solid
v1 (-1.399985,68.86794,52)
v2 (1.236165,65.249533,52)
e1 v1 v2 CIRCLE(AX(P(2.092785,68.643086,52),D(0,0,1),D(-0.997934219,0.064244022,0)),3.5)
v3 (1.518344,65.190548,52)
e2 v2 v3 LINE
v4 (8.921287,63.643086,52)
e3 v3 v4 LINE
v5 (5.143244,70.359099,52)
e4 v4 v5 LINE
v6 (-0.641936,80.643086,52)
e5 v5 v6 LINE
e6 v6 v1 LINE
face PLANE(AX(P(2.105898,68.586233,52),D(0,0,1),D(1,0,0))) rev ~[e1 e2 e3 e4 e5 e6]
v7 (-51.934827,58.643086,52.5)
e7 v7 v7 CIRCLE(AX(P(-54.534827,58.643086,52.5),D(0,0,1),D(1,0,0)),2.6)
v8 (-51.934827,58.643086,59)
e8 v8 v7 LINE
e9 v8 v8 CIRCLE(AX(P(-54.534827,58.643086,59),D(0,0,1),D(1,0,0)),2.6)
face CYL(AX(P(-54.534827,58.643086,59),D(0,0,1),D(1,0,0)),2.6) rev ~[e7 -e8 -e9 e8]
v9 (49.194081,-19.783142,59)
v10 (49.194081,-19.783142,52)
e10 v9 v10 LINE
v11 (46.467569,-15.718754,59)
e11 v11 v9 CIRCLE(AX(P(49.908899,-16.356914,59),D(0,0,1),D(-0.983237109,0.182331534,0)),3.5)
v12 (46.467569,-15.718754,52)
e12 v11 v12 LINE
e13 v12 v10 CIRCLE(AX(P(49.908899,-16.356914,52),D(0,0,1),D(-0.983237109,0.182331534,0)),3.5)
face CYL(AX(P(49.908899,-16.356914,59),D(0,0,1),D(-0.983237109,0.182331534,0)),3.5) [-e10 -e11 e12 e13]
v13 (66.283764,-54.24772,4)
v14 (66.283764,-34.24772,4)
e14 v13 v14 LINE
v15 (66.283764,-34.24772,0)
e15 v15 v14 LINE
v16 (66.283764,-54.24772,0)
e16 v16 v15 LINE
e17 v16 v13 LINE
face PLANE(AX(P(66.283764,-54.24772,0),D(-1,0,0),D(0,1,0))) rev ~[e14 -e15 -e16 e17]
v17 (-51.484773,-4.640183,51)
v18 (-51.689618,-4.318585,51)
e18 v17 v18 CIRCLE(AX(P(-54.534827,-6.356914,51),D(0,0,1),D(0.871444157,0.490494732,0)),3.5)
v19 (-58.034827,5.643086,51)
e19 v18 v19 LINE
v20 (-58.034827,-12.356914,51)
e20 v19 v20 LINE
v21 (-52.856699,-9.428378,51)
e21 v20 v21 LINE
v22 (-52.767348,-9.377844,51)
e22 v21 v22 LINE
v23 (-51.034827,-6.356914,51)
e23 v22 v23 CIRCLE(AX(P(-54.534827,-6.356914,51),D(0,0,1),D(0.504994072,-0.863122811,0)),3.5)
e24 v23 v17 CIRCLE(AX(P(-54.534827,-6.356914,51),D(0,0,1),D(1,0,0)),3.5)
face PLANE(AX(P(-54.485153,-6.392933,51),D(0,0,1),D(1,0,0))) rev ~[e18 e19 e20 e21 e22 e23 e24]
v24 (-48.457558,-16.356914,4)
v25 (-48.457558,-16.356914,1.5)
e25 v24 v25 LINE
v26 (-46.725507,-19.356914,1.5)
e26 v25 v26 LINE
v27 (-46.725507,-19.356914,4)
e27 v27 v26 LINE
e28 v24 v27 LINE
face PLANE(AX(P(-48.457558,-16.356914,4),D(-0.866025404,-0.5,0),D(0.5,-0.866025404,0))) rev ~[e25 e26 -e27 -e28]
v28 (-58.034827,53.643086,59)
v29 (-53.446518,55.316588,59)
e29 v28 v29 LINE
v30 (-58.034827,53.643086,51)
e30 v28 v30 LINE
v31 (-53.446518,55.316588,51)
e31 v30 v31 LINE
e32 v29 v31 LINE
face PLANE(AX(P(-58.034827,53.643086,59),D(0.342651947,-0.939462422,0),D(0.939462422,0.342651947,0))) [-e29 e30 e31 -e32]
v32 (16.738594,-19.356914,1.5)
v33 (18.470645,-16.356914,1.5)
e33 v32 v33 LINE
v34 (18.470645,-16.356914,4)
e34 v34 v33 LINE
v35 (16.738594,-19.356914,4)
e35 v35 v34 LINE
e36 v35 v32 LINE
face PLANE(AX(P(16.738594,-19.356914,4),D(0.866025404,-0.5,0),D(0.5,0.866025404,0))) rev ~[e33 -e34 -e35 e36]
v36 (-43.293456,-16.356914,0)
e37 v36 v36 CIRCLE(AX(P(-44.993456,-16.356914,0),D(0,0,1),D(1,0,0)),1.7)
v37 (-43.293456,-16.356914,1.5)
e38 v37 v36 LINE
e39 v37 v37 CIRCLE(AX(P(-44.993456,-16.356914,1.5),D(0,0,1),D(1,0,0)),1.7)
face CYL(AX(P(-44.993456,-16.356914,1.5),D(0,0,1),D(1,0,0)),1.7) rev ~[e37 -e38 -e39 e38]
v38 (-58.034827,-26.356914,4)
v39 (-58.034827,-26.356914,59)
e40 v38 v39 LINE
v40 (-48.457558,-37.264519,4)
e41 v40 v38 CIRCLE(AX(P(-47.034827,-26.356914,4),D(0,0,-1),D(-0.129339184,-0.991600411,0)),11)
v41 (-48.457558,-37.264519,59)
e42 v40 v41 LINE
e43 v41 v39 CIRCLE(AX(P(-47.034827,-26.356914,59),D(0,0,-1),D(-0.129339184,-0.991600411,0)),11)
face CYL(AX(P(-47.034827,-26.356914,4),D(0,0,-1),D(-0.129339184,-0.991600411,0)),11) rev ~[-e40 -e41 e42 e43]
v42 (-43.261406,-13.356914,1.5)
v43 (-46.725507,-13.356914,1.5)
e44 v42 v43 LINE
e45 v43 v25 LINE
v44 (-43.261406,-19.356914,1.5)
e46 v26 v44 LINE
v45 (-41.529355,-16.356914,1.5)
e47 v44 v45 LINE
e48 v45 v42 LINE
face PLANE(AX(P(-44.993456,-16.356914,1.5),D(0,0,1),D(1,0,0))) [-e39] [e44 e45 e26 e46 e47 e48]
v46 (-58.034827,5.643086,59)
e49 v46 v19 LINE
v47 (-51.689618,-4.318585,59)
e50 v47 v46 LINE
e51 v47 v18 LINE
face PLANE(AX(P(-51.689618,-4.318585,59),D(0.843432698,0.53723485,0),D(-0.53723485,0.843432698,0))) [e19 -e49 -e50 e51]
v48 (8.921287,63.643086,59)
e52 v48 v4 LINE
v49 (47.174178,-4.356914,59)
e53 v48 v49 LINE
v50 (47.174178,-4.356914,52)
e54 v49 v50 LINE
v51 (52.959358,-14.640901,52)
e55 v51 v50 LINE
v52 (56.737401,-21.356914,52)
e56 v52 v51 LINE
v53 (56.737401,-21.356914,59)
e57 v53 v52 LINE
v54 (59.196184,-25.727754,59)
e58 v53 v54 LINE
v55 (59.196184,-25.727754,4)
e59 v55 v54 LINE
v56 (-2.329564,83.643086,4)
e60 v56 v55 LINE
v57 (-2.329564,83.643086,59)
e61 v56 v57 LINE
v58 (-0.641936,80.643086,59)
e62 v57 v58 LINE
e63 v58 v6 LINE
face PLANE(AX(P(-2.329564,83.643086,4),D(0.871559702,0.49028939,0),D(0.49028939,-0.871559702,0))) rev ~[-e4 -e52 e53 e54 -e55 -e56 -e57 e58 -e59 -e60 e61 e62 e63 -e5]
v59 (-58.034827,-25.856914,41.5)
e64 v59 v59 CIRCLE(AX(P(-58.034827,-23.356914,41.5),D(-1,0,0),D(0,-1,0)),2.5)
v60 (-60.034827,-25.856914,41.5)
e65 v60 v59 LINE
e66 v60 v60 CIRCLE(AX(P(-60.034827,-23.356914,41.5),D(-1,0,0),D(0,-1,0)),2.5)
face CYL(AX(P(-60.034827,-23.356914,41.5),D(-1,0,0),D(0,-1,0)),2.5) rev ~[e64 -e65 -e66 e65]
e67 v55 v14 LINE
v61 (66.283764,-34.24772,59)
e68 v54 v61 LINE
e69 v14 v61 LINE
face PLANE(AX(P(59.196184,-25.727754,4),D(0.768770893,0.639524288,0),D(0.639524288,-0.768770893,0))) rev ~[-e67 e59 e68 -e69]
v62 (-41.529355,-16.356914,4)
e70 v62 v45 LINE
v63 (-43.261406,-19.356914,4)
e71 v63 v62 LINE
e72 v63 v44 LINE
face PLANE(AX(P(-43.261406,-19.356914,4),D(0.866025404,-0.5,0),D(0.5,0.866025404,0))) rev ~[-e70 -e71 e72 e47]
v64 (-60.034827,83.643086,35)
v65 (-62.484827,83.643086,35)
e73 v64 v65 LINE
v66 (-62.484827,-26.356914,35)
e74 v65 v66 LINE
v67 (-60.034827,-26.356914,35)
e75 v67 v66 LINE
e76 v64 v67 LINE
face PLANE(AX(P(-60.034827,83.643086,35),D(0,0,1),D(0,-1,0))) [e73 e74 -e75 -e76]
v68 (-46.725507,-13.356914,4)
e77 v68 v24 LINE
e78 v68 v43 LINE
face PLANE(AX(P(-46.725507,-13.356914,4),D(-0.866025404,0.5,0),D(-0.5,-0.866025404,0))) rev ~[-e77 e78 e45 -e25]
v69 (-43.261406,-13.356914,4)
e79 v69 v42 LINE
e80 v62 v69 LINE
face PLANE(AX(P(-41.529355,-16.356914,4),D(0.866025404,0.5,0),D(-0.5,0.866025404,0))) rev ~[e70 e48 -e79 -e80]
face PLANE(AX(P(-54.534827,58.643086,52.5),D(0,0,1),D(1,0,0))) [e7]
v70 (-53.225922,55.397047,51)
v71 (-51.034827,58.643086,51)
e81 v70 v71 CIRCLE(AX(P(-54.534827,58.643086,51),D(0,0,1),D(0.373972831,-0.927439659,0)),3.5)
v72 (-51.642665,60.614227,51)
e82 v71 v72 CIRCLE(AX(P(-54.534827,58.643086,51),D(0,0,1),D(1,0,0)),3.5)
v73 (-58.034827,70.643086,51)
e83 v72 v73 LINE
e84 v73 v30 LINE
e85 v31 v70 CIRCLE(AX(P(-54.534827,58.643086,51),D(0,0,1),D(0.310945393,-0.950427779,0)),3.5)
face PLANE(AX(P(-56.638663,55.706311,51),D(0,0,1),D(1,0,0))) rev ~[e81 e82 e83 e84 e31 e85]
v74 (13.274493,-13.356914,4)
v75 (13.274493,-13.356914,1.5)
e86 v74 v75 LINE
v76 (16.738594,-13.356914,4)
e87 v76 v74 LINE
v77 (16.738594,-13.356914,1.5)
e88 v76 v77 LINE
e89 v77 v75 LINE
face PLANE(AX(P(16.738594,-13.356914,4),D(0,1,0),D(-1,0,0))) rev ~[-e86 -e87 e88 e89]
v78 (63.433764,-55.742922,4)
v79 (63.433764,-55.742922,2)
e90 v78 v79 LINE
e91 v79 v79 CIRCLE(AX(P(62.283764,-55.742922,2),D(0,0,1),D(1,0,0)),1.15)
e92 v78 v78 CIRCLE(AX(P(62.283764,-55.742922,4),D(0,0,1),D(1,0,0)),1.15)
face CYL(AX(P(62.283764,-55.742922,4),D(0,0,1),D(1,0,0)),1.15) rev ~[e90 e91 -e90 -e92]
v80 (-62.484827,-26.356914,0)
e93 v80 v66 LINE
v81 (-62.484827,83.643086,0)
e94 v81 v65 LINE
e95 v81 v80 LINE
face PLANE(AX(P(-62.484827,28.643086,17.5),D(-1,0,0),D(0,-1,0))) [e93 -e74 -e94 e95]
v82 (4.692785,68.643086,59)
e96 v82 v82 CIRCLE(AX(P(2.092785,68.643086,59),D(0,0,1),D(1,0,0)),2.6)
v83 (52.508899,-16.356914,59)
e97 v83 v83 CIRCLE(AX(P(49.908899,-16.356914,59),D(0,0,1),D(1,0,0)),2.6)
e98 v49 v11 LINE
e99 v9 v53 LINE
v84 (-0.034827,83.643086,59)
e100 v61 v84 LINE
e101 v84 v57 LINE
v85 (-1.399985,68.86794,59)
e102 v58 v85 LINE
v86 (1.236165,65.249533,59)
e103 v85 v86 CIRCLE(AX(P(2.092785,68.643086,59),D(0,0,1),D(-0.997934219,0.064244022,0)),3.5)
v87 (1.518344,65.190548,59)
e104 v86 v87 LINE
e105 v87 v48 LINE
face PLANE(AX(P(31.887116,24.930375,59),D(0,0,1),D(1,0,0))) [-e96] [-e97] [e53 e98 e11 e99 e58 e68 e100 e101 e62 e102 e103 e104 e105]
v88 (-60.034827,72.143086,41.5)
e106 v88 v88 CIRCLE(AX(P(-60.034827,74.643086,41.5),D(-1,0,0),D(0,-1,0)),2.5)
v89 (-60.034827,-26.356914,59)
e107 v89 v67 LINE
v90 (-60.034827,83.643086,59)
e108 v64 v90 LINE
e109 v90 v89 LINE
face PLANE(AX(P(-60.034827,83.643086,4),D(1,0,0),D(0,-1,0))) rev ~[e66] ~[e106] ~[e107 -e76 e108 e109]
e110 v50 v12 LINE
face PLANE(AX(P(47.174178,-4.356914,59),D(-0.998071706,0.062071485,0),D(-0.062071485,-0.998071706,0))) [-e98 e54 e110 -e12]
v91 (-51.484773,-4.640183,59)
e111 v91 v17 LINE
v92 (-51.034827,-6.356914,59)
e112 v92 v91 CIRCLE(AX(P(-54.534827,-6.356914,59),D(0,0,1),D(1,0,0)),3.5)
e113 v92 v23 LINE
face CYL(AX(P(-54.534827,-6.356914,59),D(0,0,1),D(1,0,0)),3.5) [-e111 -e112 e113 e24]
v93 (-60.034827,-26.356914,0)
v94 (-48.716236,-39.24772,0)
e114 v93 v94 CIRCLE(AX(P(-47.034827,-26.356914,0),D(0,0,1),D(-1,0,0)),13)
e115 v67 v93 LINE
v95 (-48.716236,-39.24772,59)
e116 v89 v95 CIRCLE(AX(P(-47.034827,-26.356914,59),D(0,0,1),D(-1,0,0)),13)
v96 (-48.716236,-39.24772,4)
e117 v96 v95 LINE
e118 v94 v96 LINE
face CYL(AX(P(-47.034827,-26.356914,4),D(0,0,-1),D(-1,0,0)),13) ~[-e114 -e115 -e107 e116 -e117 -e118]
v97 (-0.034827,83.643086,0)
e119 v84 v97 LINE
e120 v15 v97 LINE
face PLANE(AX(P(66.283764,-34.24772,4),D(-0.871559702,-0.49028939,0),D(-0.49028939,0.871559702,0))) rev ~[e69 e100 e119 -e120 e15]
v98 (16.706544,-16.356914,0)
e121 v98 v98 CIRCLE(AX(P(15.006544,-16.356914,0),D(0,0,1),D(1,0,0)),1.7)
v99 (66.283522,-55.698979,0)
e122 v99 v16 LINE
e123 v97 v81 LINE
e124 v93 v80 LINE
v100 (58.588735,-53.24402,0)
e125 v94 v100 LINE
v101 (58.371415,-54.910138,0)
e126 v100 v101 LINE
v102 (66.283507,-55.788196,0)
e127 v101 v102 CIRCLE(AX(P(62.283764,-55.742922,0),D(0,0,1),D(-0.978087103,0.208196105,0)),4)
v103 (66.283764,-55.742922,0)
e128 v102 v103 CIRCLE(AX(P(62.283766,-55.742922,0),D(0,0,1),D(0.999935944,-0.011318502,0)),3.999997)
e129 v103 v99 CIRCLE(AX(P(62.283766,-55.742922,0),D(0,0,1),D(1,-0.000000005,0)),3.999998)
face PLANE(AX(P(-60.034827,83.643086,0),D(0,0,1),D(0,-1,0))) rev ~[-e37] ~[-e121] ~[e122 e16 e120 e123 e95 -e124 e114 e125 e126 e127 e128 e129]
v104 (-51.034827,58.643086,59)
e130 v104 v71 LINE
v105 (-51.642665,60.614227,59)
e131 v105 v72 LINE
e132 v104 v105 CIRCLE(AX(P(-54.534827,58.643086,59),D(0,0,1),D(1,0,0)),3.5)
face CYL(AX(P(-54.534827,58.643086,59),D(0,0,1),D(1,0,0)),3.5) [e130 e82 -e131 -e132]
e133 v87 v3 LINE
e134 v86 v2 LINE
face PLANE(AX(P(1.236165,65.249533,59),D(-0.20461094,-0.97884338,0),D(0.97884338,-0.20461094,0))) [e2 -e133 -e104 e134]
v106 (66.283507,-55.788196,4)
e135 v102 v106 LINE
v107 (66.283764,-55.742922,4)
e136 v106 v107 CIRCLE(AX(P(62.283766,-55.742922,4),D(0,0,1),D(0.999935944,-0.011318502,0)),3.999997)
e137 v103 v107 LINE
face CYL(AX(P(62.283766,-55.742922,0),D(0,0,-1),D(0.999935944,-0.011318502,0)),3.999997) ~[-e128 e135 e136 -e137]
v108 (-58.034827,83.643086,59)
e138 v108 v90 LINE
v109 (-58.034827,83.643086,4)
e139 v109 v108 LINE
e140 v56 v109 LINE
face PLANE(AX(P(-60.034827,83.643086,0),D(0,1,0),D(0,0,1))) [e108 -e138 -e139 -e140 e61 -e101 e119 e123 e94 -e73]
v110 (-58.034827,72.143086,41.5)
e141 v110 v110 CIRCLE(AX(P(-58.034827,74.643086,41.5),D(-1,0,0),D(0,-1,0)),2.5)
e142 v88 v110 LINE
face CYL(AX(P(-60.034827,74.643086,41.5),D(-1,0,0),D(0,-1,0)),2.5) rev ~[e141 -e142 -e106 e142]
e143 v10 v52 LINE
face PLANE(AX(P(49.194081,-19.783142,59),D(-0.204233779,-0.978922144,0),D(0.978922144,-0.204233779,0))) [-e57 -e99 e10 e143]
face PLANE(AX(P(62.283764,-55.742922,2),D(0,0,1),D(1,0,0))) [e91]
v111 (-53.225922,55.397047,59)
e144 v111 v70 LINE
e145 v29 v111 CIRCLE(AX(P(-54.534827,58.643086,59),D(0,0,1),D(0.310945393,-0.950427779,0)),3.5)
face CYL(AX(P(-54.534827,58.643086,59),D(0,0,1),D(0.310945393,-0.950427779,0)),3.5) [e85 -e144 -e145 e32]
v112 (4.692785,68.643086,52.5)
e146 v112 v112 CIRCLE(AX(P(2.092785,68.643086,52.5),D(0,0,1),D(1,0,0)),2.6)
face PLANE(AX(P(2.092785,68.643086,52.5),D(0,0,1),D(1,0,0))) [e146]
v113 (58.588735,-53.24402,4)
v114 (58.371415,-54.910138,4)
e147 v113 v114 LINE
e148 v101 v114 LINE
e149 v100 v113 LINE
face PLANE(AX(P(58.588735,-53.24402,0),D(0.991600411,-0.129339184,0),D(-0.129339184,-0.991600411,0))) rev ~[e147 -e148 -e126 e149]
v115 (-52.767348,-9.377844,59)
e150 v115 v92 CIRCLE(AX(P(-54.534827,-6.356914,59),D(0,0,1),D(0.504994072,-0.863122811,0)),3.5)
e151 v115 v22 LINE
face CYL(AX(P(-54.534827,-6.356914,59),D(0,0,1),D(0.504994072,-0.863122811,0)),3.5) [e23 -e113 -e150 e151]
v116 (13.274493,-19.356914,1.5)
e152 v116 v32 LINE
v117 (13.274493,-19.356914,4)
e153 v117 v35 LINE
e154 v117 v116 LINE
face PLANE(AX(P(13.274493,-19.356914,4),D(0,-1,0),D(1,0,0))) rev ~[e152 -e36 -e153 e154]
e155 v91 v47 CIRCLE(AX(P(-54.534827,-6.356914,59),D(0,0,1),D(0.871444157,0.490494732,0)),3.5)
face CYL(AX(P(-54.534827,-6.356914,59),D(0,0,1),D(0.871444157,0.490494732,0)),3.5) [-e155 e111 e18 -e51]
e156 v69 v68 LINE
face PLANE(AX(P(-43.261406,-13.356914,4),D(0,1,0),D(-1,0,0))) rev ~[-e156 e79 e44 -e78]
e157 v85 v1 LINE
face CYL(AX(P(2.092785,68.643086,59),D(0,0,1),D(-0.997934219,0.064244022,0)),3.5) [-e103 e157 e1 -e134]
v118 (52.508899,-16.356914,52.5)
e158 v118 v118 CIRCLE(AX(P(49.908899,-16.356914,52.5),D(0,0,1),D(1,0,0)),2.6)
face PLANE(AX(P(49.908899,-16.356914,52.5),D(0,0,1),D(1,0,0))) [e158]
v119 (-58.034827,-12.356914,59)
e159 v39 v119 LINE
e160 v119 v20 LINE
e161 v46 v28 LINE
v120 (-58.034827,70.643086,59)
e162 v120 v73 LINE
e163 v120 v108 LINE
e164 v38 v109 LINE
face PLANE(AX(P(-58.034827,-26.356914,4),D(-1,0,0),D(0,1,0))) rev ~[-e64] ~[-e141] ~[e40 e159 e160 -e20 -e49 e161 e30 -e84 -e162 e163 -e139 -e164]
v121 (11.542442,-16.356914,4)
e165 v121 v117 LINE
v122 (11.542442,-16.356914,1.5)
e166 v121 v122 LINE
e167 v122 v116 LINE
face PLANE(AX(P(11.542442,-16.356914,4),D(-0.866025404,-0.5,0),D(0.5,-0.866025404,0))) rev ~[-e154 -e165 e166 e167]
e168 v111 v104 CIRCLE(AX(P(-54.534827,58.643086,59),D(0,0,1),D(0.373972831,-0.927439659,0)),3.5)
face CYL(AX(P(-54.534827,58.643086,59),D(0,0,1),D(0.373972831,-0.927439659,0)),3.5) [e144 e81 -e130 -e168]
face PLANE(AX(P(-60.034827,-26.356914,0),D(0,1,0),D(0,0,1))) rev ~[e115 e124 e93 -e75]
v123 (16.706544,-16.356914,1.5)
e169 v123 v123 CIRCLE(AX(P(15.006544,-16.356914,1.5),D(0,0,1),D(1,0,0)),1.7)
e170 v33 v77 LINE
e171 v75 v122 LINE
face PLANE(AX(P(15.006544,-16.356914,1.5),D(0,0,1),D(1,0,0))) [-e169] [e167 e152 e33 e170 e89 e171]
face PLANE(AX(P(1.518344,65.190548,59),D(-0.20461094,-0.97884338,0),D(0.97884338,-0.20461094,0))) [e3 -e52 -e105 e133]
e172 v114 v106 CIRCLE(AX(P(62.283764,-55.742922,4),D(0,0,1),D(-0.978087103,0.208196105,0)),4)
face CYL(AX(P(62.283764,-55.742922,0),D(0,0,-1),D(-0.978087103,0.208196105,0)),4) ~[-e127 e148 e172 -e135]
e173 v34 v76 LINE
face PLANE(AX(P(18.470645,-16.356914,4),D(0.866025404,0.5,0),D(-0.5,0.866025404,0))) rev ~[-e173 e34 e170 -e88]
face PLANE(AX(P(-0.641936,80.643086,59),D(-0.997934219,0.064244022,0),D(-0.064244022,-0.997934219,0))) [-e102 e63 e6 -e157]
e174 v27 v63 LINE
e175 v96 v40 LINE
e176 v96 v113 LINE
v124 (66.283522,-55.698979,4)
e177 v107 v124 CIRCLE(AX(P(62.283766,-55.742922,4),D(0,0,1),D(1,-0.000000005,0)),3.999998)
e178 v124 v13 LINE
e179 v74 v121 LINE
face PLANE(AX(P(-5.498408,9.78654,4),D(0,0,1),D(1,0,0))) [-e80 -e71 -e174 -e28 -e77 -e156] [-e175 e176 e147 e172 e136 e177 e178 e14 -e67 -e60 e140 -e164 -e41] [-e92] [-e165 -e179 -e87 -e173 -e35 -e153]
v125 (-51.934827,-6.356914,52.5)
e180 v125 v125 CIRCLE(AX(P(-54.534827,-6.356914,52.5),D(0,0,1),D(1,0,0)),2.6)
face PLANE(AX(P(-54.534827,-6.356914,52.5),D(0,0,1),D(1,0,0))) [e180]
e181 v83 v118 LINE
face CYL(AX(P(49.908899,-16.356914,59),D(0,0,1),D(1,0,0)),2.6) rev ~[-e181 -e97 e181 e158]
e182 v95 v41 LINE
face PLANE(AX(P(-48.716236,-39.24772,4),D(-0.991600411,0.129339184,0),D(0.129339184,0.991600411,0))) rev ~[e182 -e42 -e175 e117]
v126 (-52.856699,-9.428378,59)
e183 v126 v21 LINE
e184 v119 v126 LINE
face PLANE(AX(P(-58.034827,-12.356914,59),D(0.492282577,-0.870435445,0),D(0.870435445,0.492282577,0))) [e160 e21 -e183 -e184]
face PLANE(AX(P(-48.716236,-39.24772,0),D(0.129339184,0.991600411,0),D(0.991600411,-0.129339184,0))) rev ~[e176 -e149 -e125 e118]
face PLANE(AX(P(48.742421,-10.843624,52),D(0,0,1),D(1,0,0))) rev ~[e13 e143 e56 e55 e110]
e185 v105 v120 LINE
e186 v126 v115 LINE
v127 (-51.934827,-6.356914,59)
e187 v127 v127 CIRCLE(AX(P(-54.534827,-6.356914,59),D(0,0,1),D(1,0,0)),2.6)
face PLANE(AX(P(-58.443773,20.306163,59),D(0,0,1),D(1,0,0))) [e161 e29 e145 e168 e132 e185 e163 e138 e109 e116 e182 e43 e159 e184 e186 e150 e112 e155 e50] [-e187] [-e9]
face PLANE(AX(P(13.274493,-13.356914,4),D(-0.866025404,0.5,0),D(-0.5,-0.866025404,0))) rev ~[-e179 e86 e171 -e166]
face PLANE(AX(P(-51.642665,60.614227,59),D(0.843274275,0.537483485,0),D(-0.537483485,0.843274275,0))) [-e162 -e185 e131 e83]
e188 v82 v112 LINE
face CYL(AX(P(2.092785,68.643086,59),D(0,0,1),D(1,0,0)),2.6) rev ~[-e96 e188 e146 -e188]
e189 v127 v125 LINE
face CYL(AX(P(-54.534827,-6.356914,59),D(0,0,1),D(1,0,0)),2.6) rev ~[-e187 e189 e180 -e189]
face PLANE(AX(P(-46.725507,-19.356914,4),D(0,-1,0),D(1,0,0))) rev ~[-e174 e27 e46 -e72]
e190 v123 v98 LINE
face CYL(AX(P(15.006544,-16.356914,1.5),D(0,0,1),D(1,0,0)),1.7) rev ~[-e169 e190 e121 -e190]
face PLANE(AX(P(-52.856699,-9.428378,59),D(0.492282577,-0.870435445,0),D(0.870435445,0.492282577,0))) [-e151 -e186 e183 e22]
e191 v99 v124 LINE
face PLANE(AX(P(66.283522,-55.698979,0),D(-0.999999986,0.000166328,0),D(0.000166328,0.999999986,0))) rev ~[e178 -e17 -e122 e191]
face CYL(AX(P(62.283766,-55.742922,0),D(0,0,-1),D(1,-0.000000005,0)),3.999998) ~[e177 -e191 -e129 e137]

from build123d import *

# Parameters (mm, degrees)
F1_DEPTH  = 4
F3_DEPTH  = 55
F4_R      = 2.5
F5_DEPTH  = 2
F6_R      = 1.15
F7_DEPTH  = 2
F9_DEPTH  = 2.5
F10_R     = 1.7
F11_DEPTH = 1.5
F12_R     = 1.7
F13_DEPTH = 1.5
F15_DEPTH = 8
F17_DEPTH = 7
F18_R     = 2.6
F19_DEPTH = 6.5
F20_R     = 2.6
F21_DEPTH = 6.5
F22_W     = 110
F22_H     = 35
F23_DEPTH = 2.45


with BuildPart() as f1:
    # F0 (on Top) → F1 (new body)
    with BuildSketch(Plane.XY):
        with BuildLine():
            Line((-0.0348270737, 83.6430855933), (-60.0348270737, 83.6430855933))
            Line((-60.0348270737, 83.6430855933), (-60.0348270737, -26.3569144067))
            ThreePointArc((-60.0348270737, -26.3569144067), (-56.8036121084, -34.9342589227), (-48.7162364666, -39.2477197521))
            Line((-48.7162364666, -39.2477197521), (58.5887347718, -53.2440203484))
            Line((58.5887347718, -53.2440203484), (59.1074373156, -53.3116772019))
            ThreePointArc((59.1074373156, -53.3116772019), (62.8011202697, -51.776520456), (65.9774464875, -54.2077653548))
            Line((65.9774464875, -54.2077653548), (66.2837635334, -54.2477197521))
            Line((66.2837635334, -54.2477197521), (66.2837635334, -34.2477197521))
            Line((66.2837635334, -34.2477197521), (-0.0348270737, 83.6430855933))
        make_face()
        with BuildLine():
            Line((59.1074373156, -53.3116772019), (58.5887347718, -53.2440203484))
            Line((58.5887347718, -53.2440203484), (58.3714151196, -54.9101376817))
            ThreePointArc((58.3714151196, -54.9101376817), (58.6504322817, -54.0699295678), (59.1074373156, -53.3116772019))
        make_face()
        with BuildLine():
            Line((66.2835221478, -55.6989786465), (66.2837635334, -54.2477197521))
            Line((66.2837635334, -54.2477197521), (65.9774464875, -54.2077653548))
            ThreePointArc((65.9774464875, -54.2077653548), (66.2020782301, -54.9386771517), (66.2835221478, -55.6989786465))
        make_face()
        with BuildLine():
            Line((65.9774464875, -54.2077653548), (59.1074373156, -53.3116772019))
            ThreePointArc((59.1074373156, -53.3116772019), (58.6504322817, -54.0699295678), (58.3714151196, -54.9101376817))
            ThreePointArc((58.3714151196, -54.9101376817), (61.8425650137, -59.7185156245), (66.2835073084, -55.7881961))
            Line((66.2835073084, -55.7881961), (66.2835221478, -55.6989786465))
            ThreePointArc((66.2835221478, -55.6989786465), (66.2020782301, -54.9386771517), (65.9774464875, -54.2077653548))
        make_face()
        with BuildLine():
            ThreePointArc((66.2837635334, -55.7429221007), (66.2837031866, -55.7209500421), (66.2835221478, -55.6989786465))
            Line((66.2835221478, -55.6989786465), (66.2835073084, -55.7881961))
            ThreePointArc((66.2835073084, -55.7881961), (66.2836994767, -55.7655594629), (66.2837635334, -55.7429221007))
        make_face()
        with BuildLine():
            ThreePointArc((65.9774464875, -54.2077653548), (62.8011202697, -51.776520456), (59.1074373156, -53.3116772019))
            Line((59.1074373156, -53.3116772019), (65.9774464875, -54.2077653548))
        make_face()
    extrude(amount=F1_DEPTH)

    # F2 (on face) → F3 (join)
    with BuildSketch(Plane.XY.offset(4)):
        with BuildLine():
            ThreePointArc((-48.4575580984, -37.2645189297), (-55.300722103, -33.6146674587), (-58.0348270737, -26.3569144067))
            Line((-58.0348270737, -26.3569144067), (-58.0348270737, 83.6430855933))
            Line((-58.0348270737, 83.6430855933), (-60.0348270737, 83.6430855933))
            Line((-60.0348270737, 83.6430855933), (-60.0348270737, -26.3569144067))
            ThreePointArc((-60.0348270737, -26.3569144067), (-56.8036121084, -34.9342589227), (-48.7162364666, -39.2477197521))
            Line((-48.7162364666, -39.2477197521), (-48.4575580984, -37.2645189297))
        make_face()
        Polygon((-0.0348270737, 83.6430855933), (-2.3295637346, 83.6430855933), (59.1961841109, -25.7277544167), (66.2837635334, -34.2477197521), align=None)
    extrude(amount=F3_DEPTH)

    # F4 (on face) → F5 (cut, through all)
    with BuildSketch(Plane(origin=(-60.0348270737, 0, 0), x_dir=(0, -1, 0), z_dir=(-1, 0, 0))):
        with Locations((23.3569144067, 41.5)):
            Circle(F4_R)
        with Locations((-74.6430855933, 41.5)):
            Circle(F4_R)
    extrude(amount=-F5_DEPTH, mode=Mode.SUBTRACT)

    # F6 (on face) → F7 (cut)
    with BuildSketch(Plane.XY.offset(4)):
        with Locations((62.2837635334, -55.7429221007)):
            Circle(F6_R)
    extrude(amount=-F7_DEPTH, mode=Mode.SUBTRACT)

    # F8 (on face) → F9 (cut)
    with BuildSketch(Plane.XY.offset(4)):
        Polygon((-43.2614056757, -13.3569144067), (-46.7255072909, -13.3569144067), (-48.4575580984, -16.3569144067), (-46.7255072909, -19.3569144067), (-43.2614056757, -19.3569144067), (-41.5293548681, -16.3569144067), align=None)
        Polygon((16.7385943243, -13.3569144067), (13.2744927091, -13.3569144067), (11.5424419016, -16.3569144067), (13.2744927091, -19.3569144067), (16.7385943243, -19.3569144067), (18.4706451319, -16.3569144067), align=None)
    extrude(amount=-F9_DEPTH, mode=Mode.SUBTRACT)

    # F10 (on face) → F11 (cut, through all)
    with BuildSketch(Plane.XY.offset(1.5)):
        with Locations((15.0065435167, -16.3569144067)):
            Circle(F10_R)
    extrude(amount=-F11_DEPTH, mode=Mode.SUBTRACT)

    # F12 (on face) → F13 (cut, through all)
    with BuildSketch(Plane.XY.offset(1.5)):
        with Locations((-44.9934564833, -16.3569144067)):
            Circle(F12_R)
    extrude(amount=-F13_DEPTH, mode=Mode.SUBTRACT)

    # F14 (on face) → F15 (join)
    with BuildSketch(Plane.XY.offset(59)):
        with BuildLine():
            ThreePointArc((-52.7673478203, -9.3778442451), (-51.4986965275, -8.0981528472), (-51.0348270737, -6.3569144067))
            ThreePointArc((-51.0348270737, -6.3569144067), (-51.1491815724, -5.4695562268), (-51.4847725248, -4.6401828467))
            Line((-51.4847725248, -4.6401828467), (-51.6896180966, -4.3185852191))
            ThreePointArc((-51.6896180966, -4.3185852191), (-55.6052868974, -3.0246305403), (-58.0348270737, -6.3569143518))
            ThreePointArc((-58.0348270737, -6.3569143518), (-56.3204013937, -9.3671842197), (-52.856698827, -9.4283775088))
            Line((-52.856698827, -9.4283775088), (-52.7673478203, -9.3778442451))
        make_face()
        with BuildLine():
            Line((-51.6896180966, -4.3185852191), (-51.4847725248, -4.6401828467))
            ThreePointArc((-51.4847725248, -4.6401828467), (-51.5828126312, -4.4765924312), (-51.6896180966, -4.3185852191))
        make_face()
        with BuildLine():
            ThreePointArc((-58.0348270737, -6.3569143518), (-55.6052868974, -3.0246305403), (-51.6896180966, -4.3185852191))
            Line((-51.6896180966, -4.3185852191), (-58.0348270737, 5.6430855933))
            Line((-58.0348270737, 5.6430855933), (-58.0348270737, -6.3569143518))
        make_face()
        with BuildLine():
            Line((-58.0348270737, -12.3569144067), (-52.856698827, -9.4283775088))
            ThreePointArc((-52.856698827, -9.4283775088), (-56.3204013937, -9.3671842197), (-58.0348270737, -6.3569143518))
            Line((-58.0348270737, -6.3569143518), (-58.0348270737, -12.3569144067))
        make_face()
        with BuildLine():
            Line((-58.0348270737, 58.6430855933), (-58.0348270737, 53.6430855933))
            Line((-58.0348270737, 53.6430855933), (-53.4465181967, 55.3165883683))
            ThreePointArc((-53.4465181967, 55.3165883683), (-56.5892027611, 55.8094412023), (-58.0348270737, 58.6430855933))
        make_face()
        with BuildLine():
            Line((-53.2259221658, 55.3970467855), (-53.4465181967, 55.3165883683))
            ThreePointArc((-53.4465181967, 55.3165883683), (-53.3355452586, 55.3549671149), (-53.2259221658, 55.3970467855))
        make_face()
        with BuildLine():
            ThreePointArc((-58.0348270737, 58.6430855933), (-56.5892027611, 55.8094412023), (-53.4465181967, 55.3165883683))
            Line((-53.4465181967, 55.3165883683), (-53.2259221658, 55.3970467855))
            ThreePointArc((-53.2259221658, 55.3970467855), (-51.6338645457, 56.684918999), (-51.0348270737, 58.6430855933))
            ThreePointArc((-51.0348270737, 58.6430855933), (-51.1902368109, 59.6744516652), (-51.6426647732, 60.6142266912))
            ThreePointArc((-51.6426647732, 60.6142266912), (-55.5661931455, 61.9876758561), (-58.0348270737, 58.6430855933))
        make_face()
        with BuildLine():
            Line((-58.0348270737, 70.6430855933), (-58.0348270737, 58.6430855933))
            ThreePointArc((-58.0348270737, 58.6430855933), (-55.5661931455, 61.9876758561), (-51.6426647732, 60.6142266912))
            Line((-51.6426647732, 60.6142266912), (-58.0348270737, 70.6430855933))
        make_face()
    extrude(amount=-F15_DEPTH)

    # F16 (on face) → F17 (join)
    with BuildSketch(Plane.XY.offset(59)):
        with BuildLine():
            ThreePointArc((5.1432437589, 70.3590986219), (1.3150969821, 72.0555922251), (-1.3999848728, 68.86793967))
            ThreePointArc((-1.3999848728, 68.86793967), (-0.7360869019, 66.5821430027), (1.236164718, 65.2495326066))
            Line((1.236164718, 65.2495326066), (1.518343575, 65.1905478063))
            ThreePointArc((1.518343575, 65.1905478063), (4.3554664208, 65.9728286191), (5.5927848941, 68.6430855933))
            ThreePointArc((5.5927848941, 68.6430855933), (5.4785348868, 69.5300449986), (5.1432437589, 70.3590986219))
        make_face()
        with BuildLine():
            Line((-0.6419361775, 80.6430855933), (-1.3999848728, 68.86793967))
            ThreePointArc((-1.3999848728, 68.86793967), (1.3150969821, 72.0555922251), (5.1432437589, 70.3590986219))
            Line((5.1432437589, 70.3590986219), (-0.6419361775, 80.6430855933))
        make_face()
        with BuildLine():
            Line((8.9212866456, 63.6430855933), (5.1432437589, 70.3590986219))
            ThreePointArc((5.1432437589, 70.3590986219), (5.4785348868, 69.5300449986), (5.5927848941, 68.6430855933))
            ThreePointArc((5.5927848941, 68.6430855933), (4.3554664208, 65.9728286191), (1.518343575, 65.1905478063))
            Line((1.518343575, 65.1905478063), (8.9212866456, 63.6430855933))
        make_face()
        with BuildLine():
            Line((52.9593578497, -14.6409013336), (47.1741779383, -4.3569144067))
            Line((47.1741779383, -4.3569144067), (46.4675691299, -15.7187540374))
            ThreePointArc((46.4675691299, -15.7187540374), (49.3356306127, -12.9041816709), (52.9593578497, -14.6409013336))
        make_face()
        with BuildLine():
            ThreePointArc((52.9593578497, -14.6409013336), (49.3356306127, -12.9041816709), (46.4675691299, -15.7187540374))
            ThreePointArc((46.4675691299, -15.7187540374), (47.0023195828, -18.3067338942), (49.1940807829, -19.7831419097))
            ThreePointArc((49.1940807829, -19.7831419097), (52.1166281832, -19.0727811002), (53.4088990099, -16.3569144067))
            ThreePointArc((53.4088990099, -16.3569144067), (53.2946489962, -15.4699549767), (52.9593578497, -14.6409013336))
        make_face()
        with BuildLine():
            Line((56.7374007615, -21.3569144067), (52.9593578497, -14.6409013336))
            ThreePointArc((52.9593578497, -14.6409013336), (53.2946489962, -15.4699549767), (53.4088990099, -16.3569144067))
            ThreePointArc((53.4088990099, -16.3569144067), (52.1166281832, -19.0727811002), (49.1940807829, -19.7831419097))
            Line((49.1940807829, -19.7831419097), (56.7374007615, -21.3569144067))
        make_face()
    extrude(amount=-F17_DEPTH)

    # F18 (on face) → F19 (cut)
    with BuildSketch(Plane.XY.offset(59)):
        with Locations((-54.5348270737, -6.3569144067)):
            Circle(F18_R)
        with Locations((-54.5348270737, 58.6430855933)):
            Circle(F18_R)
    extrude(amount=-F19_DEPTH, mode=Mode.SUBTRACT)

    # F20 (on face) → F21 (cut)
    with BuildSketch(Plane.XY.offset(59)):
        with Locations((49.9088990099, -16.3569144067)):
            Circle(F20_R)
        with Locations((2.0927848941, 68.6430855933)):
            Circle(F20_R)
    extrude(amount=-F21_DEPTH, mode=Mode.SUBTRACT)

    # F22 (on face) → F23 (join)
    with BuildSketch(Plane(origin=(-60.0348270737, 0, 0), x_dir=(0, -1, 0), z_dir=(-1, 0, 0))):
        with Locations((-28.6430855933, 17.5)):
            Rectangle(F22_W, F22_H)
    extrude(amount=F23_DEPTH)


solid = f1.part
